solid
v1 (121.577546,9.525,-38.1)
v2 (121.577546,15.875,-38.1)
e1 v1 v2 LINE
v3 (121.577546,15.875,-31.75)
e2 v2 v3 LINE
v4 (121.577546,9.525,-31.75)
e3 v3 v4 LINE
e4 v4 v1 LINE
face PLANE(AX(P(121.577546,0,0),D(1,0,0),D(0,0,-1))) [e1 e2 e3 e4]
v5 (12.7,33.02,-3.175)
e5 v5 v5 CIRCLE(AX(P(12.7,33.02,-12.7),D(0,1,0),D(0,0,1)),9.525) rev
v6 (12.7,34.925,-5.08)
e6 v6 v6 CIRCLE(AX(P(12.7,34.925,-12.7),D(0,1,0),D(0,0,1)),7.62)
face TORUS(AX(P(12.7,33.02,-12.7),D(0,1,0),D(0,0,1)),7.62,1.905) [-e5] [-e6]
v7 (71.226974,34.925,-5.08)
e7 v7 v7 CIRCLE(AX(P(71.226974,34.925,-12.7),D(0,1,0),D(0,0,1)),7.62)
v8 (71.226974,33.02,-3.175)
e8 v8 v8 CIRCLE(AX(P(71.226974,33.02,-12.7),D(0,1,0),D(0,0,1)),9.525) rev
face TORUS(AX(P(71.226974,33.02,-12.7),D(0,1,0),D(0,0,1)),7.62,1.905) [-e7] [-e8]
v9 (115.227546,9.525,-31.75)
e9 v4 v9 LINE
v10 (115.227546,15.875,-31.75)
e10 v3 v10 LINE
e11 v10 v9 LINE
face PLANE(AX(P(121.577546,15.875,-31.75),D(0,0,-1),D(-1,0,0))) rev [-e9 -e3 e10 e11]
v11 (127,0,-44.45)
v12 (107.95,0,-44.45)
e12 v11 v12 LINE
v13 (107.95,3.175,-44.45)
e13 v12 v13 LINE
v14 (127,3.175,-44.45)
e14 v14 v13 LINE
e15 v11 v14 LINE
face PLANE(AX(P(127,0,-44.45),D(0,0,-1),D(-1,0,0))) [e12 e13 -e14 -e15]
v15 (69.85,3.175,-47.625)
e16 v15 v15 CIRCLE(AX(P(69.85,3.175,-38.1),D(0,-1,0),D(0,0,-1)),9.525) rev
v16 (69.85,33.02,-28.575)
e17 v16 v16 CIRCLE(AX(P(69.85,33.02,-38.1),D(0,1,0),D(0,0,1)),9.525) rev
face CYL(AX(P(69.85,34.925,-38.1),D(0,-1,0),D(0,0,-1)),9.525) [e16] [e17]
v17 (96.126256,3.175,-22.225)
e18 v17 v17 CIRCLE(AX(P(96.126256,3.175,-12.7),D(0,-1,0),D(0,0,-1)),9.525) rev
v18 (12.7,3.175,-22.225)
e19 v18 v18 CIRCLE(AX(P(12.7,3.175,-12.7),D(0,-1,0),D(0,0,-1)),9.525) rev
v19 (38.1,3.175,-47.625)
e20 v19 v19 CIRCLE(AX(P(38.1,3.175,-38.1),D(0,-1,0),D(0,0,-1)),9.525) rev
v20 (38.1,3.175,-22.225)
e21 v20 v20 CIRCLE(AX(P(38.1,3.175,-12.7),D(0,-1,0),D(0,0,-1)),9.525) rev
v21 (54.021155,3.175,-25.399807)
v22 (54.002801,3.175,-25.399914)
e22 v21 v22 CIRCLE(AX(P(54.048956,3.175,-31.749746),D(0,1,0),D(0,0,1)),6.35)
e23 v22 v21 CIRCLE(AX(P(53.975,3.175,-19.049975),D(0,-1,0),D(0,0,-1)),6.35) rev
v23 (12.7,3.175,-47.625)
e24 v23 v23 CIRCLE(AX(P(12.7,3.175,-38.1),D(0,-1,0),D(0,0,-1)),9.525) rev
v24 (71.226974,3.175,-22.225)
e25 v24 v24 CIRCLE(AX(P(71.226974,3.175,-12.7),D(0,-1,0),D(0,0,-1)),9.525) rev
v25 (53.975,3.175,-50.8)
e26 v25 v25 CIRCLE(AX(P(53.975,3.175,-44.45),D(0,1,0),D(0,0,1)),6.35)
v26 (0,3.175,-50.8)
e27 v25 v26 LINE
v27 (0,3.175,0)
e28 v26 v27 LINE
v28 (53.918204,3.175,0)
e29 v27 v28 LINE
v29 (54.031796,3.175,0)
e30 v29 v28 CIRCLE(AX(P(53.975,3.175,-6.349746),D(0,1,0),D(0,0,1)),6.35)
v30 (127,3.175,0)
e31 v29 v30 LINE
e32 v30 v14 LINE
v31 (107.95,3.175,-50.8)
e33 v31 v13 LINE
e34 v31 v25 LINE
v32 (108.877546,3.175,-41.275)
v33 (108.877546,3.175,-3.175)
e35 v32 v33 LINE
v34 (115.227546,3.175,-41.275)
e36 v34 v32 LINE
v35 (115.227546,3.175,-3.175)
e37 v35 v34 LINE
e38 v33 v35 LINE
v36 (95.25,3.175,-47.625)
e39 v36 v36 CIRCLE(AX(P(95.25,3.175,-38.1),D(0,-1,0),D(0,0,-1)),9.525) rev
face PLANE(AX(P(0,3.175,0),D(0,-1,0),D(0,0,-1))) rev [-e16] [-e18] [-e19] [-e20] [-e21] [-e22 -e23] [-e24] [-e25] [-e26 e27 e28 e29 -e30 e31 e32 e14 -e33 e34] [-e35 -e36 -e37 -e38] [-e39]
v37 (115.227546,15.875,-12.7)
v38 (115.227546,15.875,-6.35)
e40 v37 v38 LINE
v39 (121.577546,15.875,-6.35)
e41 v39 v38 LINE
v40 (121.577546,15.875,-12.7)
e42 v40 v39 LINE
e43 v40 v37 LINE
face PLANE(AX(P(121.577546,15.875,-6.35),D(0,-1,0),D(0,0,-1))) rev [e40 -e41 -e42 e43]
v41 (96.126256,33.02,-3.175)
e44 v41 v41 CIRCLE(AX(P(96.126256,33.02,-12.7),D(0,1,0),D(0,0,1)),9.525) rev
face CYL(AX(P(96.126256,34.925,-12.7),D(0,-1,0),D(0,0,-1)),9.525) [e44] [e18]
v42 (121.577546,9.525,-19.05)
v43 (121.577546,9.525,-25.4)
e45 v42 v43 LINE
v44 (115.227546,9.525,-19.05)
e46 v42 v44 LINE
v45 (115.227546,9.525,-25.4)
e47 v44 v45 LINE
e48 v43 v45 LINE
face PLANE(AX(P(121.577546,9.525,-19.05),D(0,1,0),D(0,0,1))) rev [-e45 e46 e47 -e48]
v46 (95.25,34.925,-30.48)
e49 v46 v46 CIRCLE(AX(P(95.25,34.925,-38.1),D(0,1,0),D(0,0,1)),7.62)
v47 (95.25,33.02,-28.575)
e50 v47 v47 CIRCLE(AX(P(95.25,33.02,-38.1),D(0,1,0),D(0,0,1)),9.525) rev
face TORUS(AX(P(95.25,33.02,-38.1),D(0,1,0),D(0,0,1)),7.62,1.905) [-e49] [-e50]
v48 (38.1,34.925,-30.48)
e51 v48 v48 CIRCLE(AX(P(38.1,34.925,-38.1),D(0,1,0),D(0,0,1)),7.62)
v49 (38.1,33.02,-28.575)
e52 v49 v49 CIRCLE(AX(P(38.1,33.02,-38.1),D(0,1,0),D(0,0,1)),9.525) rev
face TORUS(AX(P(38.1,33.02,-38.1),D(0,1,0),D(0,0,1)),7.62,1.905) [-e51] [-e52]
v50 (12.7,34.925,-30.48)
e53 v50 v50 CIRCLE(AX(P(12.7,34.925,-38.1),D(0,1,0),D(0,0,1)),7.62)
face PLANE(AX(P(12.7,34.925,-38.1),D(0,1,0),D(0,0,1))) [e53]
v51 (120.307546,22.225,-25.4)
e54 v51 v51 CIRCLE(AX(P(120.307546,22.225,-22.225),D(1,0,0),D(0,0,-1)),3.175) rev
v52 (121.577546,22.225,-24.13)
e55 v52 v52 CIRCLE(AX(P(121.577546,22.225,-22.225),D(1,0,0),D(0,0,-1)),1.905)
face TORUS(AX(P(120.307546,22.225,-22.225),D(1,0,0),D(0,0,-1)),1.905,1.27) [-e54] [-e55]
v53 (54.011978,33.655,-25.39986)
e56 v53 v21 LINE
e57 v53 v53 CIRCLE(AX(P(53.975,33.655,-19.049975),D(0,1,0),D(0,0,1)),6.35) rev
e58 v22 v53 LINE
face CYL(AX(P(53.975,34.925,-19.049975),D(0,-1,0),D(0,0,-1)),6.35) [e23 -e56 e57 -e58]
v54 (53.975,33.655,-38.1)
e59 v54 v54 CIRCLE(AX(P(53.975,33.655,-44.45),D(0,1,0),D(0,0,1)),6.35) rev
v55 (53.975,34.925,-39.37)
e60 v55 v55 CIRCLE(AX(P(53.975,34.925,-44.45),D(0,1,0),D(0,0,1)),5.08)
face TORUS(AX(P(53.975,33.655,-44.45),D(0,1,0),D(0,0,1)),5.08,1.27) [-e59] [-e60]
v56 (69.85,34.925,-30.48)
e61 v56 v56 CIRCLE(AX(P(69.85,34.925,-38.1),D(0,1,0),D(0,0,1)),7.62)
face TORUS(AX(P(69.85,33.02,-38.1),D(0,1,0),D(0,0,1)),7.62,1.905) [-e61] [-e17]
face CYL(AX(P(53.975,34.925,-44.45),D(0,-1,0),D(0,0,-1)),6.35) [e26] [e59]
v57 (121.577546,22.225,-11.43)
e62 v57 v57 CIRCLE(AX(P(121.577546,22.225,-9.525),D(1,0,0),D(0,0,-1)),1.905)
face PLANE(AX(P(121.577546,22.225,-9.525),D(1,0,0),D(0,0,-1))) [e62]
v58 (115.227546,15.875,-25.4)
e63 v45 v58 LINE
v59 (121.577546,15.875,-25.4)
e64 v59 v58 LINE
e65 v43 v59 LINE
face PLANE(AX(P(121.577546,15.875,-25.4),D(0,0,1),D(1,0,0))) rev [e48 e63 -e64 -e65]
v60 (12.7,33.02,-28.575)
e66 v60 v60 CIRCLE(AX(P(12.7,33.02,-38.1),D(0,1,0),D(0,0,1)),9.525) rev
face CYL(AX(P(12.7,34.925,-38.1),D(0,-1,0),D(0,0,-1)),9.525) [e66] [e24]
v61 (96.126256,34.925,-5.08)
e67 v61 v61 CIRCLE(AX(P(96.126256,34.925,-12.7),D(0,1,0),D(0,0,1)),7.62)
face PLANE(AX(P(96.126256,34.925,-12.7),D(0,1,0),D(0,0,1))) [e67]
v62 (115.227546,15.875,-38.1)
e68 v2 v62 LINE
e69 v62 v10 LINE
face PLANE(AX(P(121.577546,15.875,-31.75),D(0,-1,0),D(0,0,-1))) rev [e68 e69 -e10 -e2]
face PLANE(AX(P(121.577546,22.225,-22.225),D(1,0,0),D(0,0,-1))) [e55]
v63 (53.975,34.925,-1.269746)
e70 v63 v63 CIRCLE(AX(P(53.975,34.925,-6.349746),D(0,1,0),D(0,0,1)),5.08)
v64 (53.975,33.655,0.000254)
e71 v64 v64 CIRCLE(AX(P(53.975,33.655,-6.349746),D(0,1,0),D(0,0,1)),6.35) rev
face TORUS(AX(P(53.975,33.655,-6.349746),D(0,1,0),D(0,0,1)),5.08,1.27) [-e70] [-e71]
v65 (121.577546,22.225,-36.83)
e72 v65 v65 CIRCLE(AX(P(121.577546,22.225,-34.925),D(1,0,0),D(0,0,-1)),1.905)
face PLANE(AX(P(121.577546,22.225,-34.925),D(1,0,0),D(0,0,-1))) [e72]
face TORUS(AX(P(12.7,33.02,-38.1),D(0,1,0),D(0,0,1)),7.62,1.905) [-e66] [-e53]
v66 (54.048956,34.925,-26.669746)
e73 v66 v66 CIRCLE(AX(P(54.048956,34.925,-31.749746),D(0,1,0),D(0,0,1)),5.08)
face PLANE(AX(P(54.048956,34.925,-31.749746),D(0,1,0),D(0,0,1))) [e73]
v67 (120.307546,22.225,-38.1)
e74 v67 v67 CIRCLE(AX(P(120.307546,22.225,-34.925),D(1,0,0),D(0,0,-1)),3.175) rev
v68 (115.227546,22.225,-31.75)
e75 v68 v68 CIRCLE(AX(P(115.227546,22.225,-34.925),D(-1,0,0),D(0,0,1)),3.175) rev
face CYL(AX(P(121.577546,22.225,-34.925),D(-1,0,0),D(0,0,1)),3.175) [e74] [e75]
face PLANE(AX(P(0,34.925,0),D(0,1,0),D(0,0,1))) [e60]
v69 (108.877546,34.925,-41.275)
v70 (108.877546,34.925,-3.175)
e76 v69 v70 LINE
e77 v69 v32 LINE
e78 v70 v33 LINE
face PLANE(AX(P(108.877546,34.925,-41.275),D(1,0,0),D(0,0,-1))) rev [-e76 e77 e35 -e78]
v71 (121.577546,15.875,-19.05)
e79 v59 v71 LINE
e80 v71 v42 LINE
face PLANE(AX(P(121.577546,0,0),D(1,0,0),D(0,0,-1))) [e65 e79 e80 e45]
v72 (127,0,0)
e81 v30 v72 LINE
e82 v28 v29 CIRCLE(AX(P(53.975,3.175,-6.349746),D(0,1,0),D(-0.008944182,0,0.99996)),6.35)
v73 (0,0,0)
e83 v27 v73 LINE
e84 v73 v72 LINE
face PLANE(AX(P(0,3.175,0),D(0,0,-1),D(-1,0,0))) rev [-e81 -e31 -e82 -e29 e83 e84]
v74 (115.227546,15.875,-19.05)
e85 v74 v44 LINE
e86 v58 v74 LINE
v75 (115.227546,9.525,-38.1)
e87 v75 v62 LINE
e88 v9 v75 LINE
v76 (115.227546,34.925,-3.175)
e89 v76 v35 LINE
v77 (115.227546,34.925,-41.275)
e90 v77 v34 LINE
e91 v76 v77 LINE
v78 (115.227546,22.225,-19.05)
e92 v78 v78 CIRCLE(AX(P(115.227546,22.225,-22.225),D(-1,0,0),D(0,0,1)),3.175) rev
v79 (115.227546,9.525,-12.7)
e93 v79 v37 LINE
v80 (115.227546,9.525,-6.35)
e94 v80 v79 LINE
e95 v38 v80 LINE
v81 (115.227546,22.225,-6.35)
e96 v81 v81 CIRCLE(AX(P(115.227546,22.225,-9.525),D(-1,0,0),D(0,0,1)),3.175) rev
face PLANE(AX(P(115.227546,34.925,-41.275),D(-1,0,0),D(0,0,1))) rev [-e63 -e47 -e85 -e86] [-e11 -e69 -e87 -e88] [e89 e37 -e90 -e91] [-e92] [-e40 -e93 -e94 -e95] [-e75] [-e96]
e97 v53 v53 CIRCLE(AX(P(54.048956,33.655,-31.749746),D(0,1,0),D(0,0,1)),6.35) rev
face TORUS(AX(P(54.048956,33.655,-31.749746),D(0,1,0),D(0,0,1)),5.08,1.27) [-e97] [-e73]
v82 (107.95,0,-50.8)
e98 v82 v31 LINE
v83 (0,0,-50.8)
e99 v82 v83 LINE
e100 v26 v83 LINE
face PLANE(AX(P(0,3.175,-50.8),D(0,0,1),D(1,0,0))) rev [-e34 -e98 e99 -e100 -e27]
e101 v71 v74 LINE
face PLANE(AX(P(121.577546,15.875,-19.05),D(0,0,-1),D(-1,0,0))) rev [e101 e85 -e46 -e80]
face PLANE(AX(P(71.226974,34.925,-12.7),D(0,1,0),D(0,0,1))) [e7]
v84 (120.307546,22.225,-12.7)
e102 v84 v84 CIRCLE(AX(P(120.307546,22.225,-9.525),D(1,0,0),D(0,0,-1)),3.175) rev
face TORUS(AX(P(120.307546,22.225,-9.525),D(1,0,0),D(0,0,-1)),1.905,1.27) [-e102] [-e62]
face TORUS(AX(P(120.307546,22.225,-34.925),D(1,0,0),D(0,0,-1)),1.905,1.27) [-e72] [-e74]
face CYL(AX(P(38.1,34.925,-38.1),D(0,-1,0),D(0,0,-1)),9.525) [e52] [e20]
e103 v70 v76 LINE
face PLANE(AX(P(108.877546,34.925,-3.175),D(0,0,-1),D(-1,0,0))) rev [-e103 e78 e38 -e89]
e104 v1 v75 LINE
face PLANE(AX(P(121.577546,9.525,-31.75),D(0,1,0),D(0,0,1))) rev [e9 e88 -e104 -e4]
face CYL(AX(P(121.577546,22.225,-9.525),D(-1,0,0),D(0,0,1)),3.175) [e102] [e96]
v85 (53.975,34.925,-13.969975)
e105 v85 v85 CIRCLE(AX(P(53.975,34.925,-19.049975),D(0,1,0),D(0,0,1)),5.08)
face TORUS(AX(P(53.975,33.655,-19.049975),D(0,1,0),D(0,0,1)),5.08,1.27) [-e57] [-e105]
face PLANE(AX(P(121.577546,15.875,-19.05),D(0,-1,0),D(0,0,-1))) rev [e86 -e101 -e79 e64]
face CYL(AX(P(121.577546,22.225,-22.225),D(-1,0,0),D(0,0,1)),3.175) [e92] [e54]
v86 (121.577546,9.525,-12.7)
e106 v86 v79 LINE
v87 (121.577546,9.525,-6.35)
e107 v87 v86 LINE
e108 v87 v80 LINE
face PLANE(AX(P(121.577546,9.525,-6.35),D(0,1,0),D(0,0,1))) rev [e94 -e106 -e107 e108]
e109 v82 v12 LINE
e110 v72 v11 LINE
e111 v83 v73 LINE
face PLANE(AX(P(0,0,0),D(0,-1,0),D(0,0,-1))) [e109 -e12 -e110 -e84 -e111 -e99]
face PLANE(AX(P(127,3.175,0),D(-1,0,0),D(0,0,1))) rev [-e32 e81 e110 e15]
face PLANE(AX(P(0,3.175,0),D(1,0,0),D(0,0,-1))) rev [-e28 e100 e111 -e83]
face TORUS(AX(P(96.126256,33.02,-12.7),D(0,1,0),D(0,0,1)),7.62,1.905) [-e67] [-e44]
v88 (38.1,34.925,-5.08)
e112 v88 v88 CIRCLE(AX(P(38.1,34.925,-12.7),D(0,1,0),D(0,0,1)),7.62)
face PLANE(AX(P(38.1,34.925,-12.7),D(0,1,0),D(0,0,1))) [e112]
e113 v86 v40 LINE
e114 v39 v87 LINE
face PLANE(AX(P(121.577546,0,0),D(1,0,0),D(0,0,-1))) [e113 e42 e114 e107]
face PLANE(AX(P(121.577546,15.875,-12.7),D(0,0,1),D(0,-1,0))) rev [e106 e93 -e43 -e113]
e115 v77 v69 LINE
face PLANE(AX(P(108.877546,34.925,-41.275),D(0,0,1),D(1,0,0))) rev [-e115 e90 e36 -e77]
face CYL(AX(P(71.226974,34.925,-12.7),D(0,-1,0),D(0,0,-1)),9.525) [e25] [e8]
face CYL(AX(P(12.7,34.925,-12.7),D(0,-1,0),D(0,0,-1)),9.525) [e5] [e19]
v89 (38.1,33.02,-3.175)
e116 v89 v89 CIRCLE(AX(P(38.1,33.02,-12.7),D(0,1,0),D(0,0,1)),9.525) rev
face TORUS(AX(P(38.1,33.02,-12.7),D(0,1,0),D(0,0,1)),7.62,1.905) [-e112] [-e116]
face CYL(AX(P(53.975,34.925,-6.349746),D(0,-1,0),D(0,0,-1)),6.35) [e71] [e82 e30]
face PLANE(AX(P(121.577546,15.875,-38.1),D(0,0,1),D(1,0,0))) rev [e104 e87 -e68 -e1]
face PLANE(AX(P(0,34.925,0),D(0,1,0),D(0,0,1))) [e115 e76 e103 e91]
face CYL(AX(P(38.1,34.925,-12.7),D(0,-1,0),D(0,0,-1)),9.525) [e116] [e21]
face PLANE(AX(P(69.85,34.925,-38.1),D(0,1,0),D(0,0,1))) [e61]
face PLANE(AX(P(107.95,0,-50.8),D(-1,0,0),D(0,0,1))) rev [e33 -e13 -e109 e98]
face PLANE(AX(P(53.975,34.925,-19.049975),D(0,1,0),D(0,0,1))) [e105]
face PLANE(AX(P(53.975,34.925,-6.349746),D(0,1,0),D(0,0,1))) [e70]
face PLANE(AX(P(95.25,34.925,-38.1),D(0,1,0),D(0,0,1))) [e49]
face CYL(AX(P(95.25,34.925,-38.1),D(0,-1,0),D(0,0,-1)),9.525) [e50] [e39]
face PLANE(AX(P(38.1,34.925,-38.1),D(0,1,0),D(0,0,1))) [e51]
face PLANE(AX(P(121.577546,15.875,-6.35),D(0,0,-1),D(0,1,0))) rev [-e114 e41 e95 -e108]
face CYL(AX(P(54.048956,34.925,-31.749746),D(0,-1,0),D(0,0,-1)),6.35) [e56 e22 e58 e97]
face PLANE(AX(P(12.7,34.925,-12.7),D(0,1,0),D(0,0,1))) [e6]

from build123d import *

# Parameters (mm, degrees)
SKETCH1_W            = 127
SKETCH1_H            = 50.8
BOSS_EXTRUDE1_DEPTH  = 3.175
SKETCH2_W            = 19.05
SKETCH2_H            = 6.35
CUT_EXTRUDE1_DEPTH   = 3.175
SKETCH3_R            = 6.35
BOSS_EXTRUDE17_DEPTH = 31.75
SKETCH6_R            = 6.35
BOSS_EXTRUDE19_DEPTH = 31.75
SKETCH7_R            = 6.35
BOSS_EXTRUDE20_DEPTH = 31.75
SKETCH8_R            = 9.525
BOSS_EXTRUDE21_DEPTH = 31.75
SKETCH9_W            = 6.35
SKETCH9_H            = 38.1
BOSS_EXTRUDE22_DEPTH = 31.75
SKETCH11_W           = 6.35
SKETCH11_H           = 6.35
BOSS_EXTRUDE23_DEPTH = 6.35
FILLET5_R            = 1.905
FILLET7_R            = 1.27
FILLET9_R            = 1.27
FILLET10_R           = 1.27
SKETCH5_R            = 6.35
BOSS_EXTRUDE24_DEPTH = 31.75
SKETCH12_R           = 3.175
BOSS_EXTRUDE25_DEPTH = 6.35
FILLET12_R           = 1.27


with BuildPart() as part:
    # Sketch1 → Boss-Extrude1 (new body)
    with BuildSketch(Plane(origin=(0, 0, 0), x_dir=(1, 0, 0), z_dir=(0, 1, 0))):
        with Locations((63.5, 25.4)):
            Rectangle(SKETCH1_W, SKETCH1_H)
    extrude(amount=BOSS_EXTRUDE1_DEPTH)

    # Sketch2 → Cut-Extrude1 (cut)
    with BuildSketch(Plane(origin=(0, 3.175, 0), x_dir=(1, 0, 0), z_dir=(0, 1, 0))):
        with Locations((117.475, 47.625)):
            Rectangle(SKETCH2_W, SKETCH2_H)
    extrude(amount=-CUT_EXTRUDE1_DEPTH, mode=Mode.SUBTRACT)

    # Sketch3 → Boss-Extrude17 (add)
    with BuildSketch(Plane(origin=(0, 3.175, 0), x_dir=(1, 0, 0), z_dir=(0, 1, 0))):
        with Locations(Location((53.975, 44.45, 0), (0, 0, 90))):
            Circle(SKETCH3_R)
    extrude(amount=BOSS_EXTRUDE17_DEPTH)

    # Sketch6 → Boss-Extrude19 (add)
    with BuildSketch(Plane(origin=(0, 3.175, 0), x_dir=(1, 0, 0), z_dir=(0, 1, 0))):
        with Locations(Location((53.975, 19.0499746, 0), (0, 0, 90))):
            Circle(SKETCH6_R)
    extrude(amount=BOSS_EXTRUDE19_DEPTH)

    # Sketch7 → Boss-Extrude20 (add)
    with BuildSketch(Plane(origin=(0, 3.175, 0), x_dir=(1, 0, 0), z_dir=(0, 1, 0))):
        with Locations(Location((53.975, 6.349746, 0), (0, 0, 269.48752926))):
            Circle(SKETCH7_R)
    extrude(amount=BOSS_EXTRUDE20_DEPTH)

    # Sketch8 → Boss-Extrude21 (add)
    with BuildSketch(Plane(origin=(0, 3.175, 0), x_dir=(1, 0, 0), z_dir=(0, 1, 0))):
        with Locations(Location((12.7, 38.1, 0), (0, 0, 90))):
            Circle(SKETCH8_R)
        with Locations(Location((12.7, 12.7, 0), (0, 0, 90))):
            Circle(SKETCH8_R)
        with Locations(Location((38.1, 38.1, 0), (0, 0, 90))):
            Circle(SKETCH8_R)
        with Locations(Location((38.1, 12.7, 0), (0, 0, 90))):
            Circle(SKETCH8_R)
        with Locations(Location((69.85, 38.1, 0), (0, 0, 90))):
            Circle(SKETCH8_R)
        with Locations(Location((71.226973821, 12.7, 0), (0, 0, 90))):
            Circle(SKETCH8_R)
        with Locations(Location((95.25, 38.1, 0), (0, 0, 90))):
            Circle(SKETCH8_R)
        with Locations(Location((96.126256068, 12.7, 0), (0, 0, 90))):
            Circle(SKETCH8_R)
    extrude(amount=BOSS_EXTRUDE21_DEPTH)

    # Sketch9 → Boss-Extrude22 (add)
    with BuildSketch(Plane(origin=(0, 3.175, 0), x_dir=(1, 0, 0), z_dir=(0, 1, 0))):
        with Locations((112.052546384, 22.225)):
            Rectangle(SKETCH9_W, SKETCH9_H)
    extrude(amount=BOSS_EXTRUDE22_DEPTH)

    # Sketch11 → Boss-Extrude23 (add)
    with BuildSketch(Plane(origin=(115.227546384, 0, 0), x_dir=(0, 0, -1), z_dir=(1, 0, 0))):
        with Locations((9.525, 12.7)):
            Rectangle(SKETCH11_W, SKETCH11_H)
        with Locations((22.225, 12.7)):
            Rectangle(SKETCH11_W, SKETCH11_H)
        with Locations((34.925, 12.7)):
            Rectangle(SKETCH11_W, SKETCH11_H)
    extrude(amount=BOSS_EXTRUDE23_DEPTH)

    # Fillet5
    fillet5_edges = [part.edges().sort_by_distance(p)[0] for p in [
        (12.7, 34.925, -3.175),
        (12.7, 34.925, -28.575),
        (38.1, 34.925, -28.575),
        (38.1, 34.925, -3.175),
        (69.85, 34.925, -28.575),
        (71.226973821, 34.925, -3.175),
        (96.126256068, 34.925, -3.175),
        (95.25, 34.925, -28.575),
    ]]
    fillet(fillet5_edges, radius=FILLET5_R)

    # Fillet7
    fillet7_edges = [part.edges().sort_by_distance(p)[0] for p in [
        (54.031795559, 34.925, -12.699492),
    ]]
    fillet(fillet7_edges, radius=FILLET7_R)

    # Fillet9
    fillet9_edges = [part.edges().sort_by_distance(p)[0] for p in [
        (53.975, 34.925, -38.1),
    ]]
    fillet(fillet9_edges, radius=FILLET9_R)

    # Fillet10
    fillet10_edges = [part.edges().sort_by_distance(p)[0] for p in [
        (53.975, 34.925, -12.6999746),
    ]]
    fillet(fillet10_edges, radius=FILLET10_R)

    # Sketch5 → Boss-Extrude24 (add)
    with BuildSketch(Plane(origin=(0, 3.175, 0), x_dir=(1, 0, 0), z_dir=(0, 1, 0))):
        with Locations(Location((54.048956129, 31.749746, 0), (0, 0, 269.583541403))):
            Circle(SKETCH5_R)
    extrude(amount=BOSS_EXTRUDE24_DEPTH)

    # Fillet11: read off the stored shape, not the designer's step
    # Fillet11 outline → Fillet11 (revolve, cut)
    with BuildSketch(Plane(origin=(54.048956129, 0, -31.749746), x_dir=(1, 0, 0), z_dir=(0, 0, 1))):
        with BuildLine():
            ThreePointArc((5.08, 34.925), (5.978025612, 34.553025612), (6.35, 33.655))
            Line((6.35, 33.655), (6.35, 34.925))
            Line((6.35, 34.925), (5.08, 34.925))
        make_face()
    revolve(axis=Axis((54.048956129, 0, -31.749746), (0, 1, 0)), mode=Mode.SUBTRACT)

    # Sketch12 → Boss-Extrude25 (add)
    with BuildSketch(Plane(origin=(115.227546384, 0, 0), x_dir=(0, 0, -1), z_dir=(1, 0, 0))):
        with Locations(Location((9.525, 22.225, 0), (0, 0, 180))):
            Circle(SKETCH12_R)
        with Locations(Location((22.225, 22.225, 0), (0, 0, 180))):
            Circle(SKETCH12_R)
        with Locations(Location((34.925, 22.225, 0), (0, 0, 180))):
            Circle(SKETCH12_R)
    extrude(amount=BOSS_EXTRUDE25_DEPTH)

    # Fillet12
    fillet12_edges = [part.edges().sort_by_distance(p)[0] for p in [
        (121.577546384, 22.225, -12.7),
        (121.577546384, 22.225, -25.4),
        (121.577546384, 22.225, -38.1),
    ]]
    fillet(fillet12_edges, radius=FILLET12_R)


solid = part.part
